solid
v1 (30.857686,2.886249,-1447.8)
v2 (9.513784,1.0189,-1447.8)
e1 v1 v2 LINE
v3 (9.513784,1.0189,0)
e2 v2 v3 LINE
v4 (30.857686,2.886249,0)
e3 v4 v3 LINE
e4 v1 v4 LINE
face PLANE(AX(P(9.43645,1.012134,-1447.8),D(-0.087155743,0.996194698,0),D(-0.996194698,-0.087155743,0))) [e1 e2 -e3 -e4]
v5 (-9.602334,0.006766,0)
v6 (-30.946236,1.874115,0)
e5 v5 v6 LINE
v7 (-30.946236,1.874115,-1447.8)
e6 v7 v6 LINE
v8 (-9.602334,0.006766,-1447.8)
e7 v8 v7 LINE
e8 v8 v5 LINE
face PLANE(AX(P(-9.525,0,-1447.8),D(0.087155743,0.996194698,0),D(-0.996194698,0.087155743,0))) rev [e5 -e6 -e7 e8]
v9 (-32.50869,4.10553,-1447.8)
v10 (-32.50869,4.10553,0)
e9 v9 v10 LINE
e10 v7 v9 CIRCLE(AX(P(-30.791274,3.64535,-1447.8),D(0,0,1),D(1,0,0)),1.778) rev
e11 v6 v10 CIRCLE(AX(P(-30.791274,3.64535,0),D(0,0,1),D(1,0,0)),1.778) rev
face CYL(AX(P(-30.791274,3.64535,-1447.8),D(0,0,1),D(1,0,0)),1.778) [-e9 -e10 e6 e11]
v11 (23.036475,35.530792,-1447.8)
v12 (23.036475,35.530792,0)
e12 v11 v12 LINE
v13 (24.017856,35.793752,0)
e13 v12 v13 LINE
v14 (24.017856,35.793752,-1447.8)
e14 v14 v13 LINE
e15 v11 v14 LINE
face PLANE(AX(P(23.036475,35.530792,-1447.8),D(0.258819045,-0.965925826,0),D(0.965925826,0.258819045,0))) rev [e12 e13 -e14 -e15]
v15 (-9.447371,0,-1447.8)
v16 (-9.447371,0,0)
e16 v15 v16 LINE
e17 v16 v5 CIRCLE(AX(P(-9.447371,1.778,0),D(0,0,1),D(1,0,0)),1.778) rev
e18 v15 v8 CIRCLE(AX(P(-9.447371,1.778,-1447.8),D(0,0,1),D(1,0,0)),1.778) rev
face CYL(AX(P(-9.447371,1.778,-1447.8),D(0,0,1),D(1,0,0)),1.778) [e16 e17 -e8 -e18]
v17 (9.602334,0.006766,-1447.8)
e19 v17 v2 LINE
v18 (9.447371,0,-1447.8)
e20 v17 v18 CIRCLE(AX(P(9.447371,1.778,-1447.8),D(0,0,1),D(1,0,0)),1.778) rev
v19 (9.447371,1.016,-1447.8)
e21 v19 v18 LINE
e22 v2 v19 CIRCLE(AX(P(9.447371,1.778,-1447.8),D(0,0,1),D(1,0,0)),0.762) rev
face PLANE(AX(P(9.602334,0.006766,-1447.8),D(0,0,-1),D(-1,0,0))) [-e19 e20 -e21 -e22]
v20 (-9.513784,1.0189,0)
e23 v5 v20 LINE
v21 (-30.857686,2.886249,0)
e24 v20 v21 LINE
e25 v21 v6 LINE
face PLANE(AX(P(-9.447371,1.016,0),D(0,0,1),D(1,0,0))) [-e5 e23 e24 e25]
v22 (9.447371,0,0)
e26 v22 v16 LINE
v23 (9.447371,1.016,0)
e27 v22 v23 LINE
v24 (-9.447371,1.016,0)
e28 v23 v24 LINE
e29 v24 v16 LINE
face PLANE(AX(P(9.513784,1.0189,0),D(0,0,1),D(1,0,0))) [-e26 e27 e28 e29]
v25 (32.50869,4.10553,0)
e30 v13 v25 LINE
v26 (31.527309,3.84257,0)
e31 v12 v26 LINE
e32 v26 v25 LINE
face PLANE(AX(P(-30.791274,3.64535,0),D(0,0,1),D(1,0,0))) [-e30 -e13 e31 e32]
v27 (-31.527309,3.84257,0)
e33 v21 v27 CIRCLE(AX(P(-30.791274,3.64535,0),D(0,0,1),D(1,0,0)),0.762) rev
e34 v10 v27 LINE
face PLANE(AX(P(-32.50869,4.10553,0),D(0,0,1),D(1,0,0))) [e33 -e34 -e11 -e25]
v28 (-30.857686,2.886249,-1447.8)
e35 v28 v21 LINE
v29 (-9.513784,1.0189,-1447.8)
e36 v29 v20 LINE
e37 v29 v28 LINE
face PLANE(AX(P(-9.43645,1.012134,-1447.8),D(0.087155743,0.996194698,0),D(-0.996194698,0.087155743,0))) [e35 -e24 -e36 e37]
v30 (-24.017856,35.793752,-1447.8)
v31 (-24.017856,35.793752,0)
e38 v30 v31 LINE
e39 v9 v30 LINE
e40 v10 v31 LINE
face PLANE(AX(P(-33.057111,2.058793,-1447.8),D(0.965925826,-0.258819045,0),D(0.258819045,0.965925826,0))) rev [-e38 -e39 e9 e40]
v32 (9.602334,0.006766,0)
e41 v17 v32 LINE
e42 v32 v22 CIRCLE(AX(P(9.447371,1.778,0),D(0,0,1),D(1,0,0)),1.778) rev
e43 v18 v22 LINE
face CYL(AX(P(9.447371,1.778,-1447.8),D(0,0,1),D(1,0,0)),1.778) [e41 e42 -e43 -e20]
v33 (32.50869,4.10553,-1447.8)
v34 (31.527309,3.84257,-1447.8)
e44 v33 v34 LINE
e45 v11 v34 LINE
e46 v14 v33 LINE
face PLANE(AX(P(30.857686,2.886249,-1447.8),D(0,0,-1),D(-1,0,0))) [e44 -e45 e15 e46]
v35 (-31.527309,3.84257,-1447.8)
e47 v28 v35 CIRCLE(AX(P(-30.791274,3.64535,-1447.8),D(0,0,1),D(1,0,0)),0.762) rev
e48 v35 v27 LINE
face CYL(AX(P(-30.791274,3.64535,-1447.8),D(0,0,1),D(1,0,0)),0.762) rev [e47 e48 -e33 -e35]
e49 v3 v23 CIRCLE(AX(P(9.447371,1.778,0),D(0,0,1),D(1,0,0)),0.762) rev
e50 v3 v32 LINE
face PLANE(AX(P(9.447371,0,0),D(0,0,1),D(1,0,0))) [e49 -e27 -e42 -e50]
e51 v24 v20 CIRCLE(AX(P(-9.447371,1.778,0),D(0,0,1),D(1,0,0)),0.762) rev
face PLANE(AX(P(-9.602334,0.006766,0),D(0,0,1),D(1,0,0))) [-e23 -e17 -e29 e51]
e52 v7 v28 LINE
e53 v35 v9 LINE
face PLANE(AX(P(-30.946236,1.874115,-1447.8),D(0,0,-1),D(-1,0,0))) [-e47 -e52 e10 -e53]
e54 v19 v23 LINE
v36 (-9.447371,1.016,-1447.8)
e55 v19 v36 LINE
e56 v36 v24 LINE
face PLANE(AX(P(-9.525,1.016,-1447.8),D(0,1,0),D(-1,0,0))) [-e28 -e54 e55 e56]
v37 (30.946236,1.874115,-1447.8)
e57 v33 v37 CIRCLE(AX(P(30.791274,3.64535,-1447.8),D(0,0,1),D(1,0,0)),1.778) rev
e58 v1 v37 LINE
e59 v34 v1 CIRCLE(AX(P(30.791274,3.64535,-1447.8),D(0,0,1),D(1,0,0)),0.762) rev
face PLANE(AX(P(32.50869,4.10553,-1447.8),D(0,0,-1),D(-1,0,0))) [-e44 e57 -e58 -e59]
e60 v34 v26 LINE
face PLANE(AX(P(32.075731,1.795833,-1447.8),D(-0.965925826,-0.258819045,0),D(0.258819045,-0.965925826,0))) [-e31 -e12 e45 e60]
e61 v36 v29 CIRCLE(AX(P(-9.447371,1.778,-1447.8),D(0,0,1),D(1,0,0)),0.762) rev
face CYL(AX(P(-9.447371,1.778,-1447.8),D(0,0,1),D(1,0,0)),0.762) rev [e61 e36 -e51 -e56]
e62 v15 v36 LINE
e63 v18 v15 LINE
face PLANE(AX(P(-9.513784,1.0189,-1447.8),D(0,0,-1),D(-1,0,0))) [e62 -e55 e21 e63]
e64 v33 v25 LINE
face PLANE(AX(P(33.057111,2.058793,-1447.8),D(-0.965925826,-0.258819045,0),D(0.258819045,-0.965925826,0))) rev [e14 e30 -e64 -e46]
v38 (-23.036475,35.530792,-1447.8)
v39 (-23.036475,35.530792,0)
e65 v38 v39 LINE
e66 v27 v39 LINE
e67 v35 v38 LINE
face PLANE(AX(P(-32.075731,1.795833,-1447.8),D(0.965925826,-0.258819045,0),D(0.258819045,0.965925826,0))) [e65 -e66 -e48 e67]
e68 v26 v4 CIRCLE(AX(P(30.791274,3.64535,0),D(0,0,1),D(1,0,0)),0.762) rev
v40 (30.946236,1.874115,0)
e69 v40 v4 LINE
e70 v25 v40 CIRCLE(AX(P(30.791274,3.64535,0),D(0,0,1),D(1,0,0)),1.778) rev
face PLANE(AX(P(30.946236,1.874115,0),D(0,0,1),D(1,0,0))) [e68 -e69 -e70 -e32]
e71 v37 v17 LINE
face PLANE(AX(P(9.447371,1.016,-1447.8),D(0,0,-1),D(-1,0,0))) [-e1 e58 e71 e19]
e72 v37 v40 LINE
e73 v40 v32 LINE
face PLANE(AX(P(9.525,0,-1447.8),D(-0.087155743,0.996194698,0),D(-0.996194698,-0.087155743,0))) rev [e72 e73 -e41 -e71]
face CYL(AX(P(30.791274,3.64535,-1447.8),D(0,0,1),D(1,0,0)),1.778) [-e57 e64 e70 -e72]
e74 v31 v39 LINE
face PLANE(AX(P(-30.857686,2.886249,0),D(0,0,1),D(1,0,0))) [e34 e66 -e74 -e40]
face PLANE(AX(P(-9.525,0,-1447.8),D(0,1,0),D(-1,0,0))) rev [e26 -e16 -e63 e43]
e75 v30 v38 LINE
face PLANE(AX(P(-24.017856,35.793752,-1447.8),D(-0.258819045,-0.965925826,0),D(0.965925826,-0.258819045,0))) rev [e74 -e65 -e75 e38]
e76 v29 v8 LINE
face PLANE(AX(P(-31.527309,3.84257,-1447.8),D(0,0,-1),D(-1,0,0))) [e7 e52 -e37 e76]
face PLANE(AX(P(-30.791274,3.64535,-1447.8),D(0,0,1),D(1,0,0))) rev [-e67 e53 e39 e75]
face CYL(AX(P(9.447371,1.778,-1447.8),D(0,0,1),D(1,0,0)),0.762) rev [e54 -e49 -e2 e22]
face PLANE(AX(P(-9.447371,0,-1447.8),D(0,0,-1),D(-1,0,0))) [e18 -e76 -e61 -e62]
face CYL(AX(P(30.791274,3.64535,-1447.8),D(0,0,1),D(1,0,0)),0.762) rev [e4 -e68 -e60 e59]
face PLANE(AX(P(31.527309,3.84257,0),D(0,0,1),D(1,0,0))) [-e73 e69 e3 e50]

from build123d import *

# Parameters (mm, degrees)
BASE_FLANGE1_DEPTH = 1447.8


# Sheet-metal steps are written as plain solids
with BuildPart() as part:
    # Sketch1 → Base-Flange1 (new body)
    with BuildSketch(Plane.XY):
        with BuildLine():
            Line((-24.017856008, 35.793752438), (-32.508689678, 4.105529785))
            ThreePointArc((-32.508689678, 4.105529785), (-32.247725893, 2.625530619), (-30.946236469, 1.87411535))
            Line((-30.946236469, 1.87411535), (-9.602333754, 0.006765827))
            ThreePointArc((-9.602333754, 0.006765827), (-9.524926114, 0.001692262), (-9.447370844, 0))
            Line((-9.447370844, 0), (9.447370844, 0))
            ThreePointArc((9.447370844, 0), (9.524926114, 0.001692262), (9.602333754, 0.006765827))
            Line((9.602333754, 0.006765827), (30.946236469, 1.87411535))
            ThreePointArc((30.946236469, 1.87411535), (32.247725893, 2.625530619), (32.508689678, 4.105529785))
            Line((32.508689678, 4.105529785), (24.017856008, 35.793752438))
            Line((24.017856008, 35.793752438), (23.036475369, 35.530792289))
            Line((23.036475369, 35.530792289), (31.527309038, 3.842569635))
            ThreePointArc((31.527309038, 3.842569635), (31.415467416, 3.208284278), (30.857686234, 2.886249163))
            Line((30.857686234, 2.886249163), (9.513783519, 1.01889964))
            ThreePointArc((9.513783519, 1.01889964), (9.480608817, 1.016725255), (9.447370844, 1.016))
            Line((9.447370844, 1.016), (-9.447370844, 1.016))
            ThreePointArc((-9.447370844, 1.016), (-9.480608817, 1.016725255), (-9.513783519, 1.01889964))
            Line((-9.513783519, 1.01889964), (-30.857686234, 2.886249163))
            ThreePointArc((-30.857686234, 2.886249163), (-31.415467416, 3.208284278), (-31.527309038, 3.842569635))
            Line((-31.527309038, 3.842569635), (-23.036475369, 35.530792289))
            Line((-23.036475369, 35.530792289), (-24.017856008, 35.793752438))
        make_face()
    extrude(amount=-BASE_FLANGE1_DEPTH)


solid = part.part
